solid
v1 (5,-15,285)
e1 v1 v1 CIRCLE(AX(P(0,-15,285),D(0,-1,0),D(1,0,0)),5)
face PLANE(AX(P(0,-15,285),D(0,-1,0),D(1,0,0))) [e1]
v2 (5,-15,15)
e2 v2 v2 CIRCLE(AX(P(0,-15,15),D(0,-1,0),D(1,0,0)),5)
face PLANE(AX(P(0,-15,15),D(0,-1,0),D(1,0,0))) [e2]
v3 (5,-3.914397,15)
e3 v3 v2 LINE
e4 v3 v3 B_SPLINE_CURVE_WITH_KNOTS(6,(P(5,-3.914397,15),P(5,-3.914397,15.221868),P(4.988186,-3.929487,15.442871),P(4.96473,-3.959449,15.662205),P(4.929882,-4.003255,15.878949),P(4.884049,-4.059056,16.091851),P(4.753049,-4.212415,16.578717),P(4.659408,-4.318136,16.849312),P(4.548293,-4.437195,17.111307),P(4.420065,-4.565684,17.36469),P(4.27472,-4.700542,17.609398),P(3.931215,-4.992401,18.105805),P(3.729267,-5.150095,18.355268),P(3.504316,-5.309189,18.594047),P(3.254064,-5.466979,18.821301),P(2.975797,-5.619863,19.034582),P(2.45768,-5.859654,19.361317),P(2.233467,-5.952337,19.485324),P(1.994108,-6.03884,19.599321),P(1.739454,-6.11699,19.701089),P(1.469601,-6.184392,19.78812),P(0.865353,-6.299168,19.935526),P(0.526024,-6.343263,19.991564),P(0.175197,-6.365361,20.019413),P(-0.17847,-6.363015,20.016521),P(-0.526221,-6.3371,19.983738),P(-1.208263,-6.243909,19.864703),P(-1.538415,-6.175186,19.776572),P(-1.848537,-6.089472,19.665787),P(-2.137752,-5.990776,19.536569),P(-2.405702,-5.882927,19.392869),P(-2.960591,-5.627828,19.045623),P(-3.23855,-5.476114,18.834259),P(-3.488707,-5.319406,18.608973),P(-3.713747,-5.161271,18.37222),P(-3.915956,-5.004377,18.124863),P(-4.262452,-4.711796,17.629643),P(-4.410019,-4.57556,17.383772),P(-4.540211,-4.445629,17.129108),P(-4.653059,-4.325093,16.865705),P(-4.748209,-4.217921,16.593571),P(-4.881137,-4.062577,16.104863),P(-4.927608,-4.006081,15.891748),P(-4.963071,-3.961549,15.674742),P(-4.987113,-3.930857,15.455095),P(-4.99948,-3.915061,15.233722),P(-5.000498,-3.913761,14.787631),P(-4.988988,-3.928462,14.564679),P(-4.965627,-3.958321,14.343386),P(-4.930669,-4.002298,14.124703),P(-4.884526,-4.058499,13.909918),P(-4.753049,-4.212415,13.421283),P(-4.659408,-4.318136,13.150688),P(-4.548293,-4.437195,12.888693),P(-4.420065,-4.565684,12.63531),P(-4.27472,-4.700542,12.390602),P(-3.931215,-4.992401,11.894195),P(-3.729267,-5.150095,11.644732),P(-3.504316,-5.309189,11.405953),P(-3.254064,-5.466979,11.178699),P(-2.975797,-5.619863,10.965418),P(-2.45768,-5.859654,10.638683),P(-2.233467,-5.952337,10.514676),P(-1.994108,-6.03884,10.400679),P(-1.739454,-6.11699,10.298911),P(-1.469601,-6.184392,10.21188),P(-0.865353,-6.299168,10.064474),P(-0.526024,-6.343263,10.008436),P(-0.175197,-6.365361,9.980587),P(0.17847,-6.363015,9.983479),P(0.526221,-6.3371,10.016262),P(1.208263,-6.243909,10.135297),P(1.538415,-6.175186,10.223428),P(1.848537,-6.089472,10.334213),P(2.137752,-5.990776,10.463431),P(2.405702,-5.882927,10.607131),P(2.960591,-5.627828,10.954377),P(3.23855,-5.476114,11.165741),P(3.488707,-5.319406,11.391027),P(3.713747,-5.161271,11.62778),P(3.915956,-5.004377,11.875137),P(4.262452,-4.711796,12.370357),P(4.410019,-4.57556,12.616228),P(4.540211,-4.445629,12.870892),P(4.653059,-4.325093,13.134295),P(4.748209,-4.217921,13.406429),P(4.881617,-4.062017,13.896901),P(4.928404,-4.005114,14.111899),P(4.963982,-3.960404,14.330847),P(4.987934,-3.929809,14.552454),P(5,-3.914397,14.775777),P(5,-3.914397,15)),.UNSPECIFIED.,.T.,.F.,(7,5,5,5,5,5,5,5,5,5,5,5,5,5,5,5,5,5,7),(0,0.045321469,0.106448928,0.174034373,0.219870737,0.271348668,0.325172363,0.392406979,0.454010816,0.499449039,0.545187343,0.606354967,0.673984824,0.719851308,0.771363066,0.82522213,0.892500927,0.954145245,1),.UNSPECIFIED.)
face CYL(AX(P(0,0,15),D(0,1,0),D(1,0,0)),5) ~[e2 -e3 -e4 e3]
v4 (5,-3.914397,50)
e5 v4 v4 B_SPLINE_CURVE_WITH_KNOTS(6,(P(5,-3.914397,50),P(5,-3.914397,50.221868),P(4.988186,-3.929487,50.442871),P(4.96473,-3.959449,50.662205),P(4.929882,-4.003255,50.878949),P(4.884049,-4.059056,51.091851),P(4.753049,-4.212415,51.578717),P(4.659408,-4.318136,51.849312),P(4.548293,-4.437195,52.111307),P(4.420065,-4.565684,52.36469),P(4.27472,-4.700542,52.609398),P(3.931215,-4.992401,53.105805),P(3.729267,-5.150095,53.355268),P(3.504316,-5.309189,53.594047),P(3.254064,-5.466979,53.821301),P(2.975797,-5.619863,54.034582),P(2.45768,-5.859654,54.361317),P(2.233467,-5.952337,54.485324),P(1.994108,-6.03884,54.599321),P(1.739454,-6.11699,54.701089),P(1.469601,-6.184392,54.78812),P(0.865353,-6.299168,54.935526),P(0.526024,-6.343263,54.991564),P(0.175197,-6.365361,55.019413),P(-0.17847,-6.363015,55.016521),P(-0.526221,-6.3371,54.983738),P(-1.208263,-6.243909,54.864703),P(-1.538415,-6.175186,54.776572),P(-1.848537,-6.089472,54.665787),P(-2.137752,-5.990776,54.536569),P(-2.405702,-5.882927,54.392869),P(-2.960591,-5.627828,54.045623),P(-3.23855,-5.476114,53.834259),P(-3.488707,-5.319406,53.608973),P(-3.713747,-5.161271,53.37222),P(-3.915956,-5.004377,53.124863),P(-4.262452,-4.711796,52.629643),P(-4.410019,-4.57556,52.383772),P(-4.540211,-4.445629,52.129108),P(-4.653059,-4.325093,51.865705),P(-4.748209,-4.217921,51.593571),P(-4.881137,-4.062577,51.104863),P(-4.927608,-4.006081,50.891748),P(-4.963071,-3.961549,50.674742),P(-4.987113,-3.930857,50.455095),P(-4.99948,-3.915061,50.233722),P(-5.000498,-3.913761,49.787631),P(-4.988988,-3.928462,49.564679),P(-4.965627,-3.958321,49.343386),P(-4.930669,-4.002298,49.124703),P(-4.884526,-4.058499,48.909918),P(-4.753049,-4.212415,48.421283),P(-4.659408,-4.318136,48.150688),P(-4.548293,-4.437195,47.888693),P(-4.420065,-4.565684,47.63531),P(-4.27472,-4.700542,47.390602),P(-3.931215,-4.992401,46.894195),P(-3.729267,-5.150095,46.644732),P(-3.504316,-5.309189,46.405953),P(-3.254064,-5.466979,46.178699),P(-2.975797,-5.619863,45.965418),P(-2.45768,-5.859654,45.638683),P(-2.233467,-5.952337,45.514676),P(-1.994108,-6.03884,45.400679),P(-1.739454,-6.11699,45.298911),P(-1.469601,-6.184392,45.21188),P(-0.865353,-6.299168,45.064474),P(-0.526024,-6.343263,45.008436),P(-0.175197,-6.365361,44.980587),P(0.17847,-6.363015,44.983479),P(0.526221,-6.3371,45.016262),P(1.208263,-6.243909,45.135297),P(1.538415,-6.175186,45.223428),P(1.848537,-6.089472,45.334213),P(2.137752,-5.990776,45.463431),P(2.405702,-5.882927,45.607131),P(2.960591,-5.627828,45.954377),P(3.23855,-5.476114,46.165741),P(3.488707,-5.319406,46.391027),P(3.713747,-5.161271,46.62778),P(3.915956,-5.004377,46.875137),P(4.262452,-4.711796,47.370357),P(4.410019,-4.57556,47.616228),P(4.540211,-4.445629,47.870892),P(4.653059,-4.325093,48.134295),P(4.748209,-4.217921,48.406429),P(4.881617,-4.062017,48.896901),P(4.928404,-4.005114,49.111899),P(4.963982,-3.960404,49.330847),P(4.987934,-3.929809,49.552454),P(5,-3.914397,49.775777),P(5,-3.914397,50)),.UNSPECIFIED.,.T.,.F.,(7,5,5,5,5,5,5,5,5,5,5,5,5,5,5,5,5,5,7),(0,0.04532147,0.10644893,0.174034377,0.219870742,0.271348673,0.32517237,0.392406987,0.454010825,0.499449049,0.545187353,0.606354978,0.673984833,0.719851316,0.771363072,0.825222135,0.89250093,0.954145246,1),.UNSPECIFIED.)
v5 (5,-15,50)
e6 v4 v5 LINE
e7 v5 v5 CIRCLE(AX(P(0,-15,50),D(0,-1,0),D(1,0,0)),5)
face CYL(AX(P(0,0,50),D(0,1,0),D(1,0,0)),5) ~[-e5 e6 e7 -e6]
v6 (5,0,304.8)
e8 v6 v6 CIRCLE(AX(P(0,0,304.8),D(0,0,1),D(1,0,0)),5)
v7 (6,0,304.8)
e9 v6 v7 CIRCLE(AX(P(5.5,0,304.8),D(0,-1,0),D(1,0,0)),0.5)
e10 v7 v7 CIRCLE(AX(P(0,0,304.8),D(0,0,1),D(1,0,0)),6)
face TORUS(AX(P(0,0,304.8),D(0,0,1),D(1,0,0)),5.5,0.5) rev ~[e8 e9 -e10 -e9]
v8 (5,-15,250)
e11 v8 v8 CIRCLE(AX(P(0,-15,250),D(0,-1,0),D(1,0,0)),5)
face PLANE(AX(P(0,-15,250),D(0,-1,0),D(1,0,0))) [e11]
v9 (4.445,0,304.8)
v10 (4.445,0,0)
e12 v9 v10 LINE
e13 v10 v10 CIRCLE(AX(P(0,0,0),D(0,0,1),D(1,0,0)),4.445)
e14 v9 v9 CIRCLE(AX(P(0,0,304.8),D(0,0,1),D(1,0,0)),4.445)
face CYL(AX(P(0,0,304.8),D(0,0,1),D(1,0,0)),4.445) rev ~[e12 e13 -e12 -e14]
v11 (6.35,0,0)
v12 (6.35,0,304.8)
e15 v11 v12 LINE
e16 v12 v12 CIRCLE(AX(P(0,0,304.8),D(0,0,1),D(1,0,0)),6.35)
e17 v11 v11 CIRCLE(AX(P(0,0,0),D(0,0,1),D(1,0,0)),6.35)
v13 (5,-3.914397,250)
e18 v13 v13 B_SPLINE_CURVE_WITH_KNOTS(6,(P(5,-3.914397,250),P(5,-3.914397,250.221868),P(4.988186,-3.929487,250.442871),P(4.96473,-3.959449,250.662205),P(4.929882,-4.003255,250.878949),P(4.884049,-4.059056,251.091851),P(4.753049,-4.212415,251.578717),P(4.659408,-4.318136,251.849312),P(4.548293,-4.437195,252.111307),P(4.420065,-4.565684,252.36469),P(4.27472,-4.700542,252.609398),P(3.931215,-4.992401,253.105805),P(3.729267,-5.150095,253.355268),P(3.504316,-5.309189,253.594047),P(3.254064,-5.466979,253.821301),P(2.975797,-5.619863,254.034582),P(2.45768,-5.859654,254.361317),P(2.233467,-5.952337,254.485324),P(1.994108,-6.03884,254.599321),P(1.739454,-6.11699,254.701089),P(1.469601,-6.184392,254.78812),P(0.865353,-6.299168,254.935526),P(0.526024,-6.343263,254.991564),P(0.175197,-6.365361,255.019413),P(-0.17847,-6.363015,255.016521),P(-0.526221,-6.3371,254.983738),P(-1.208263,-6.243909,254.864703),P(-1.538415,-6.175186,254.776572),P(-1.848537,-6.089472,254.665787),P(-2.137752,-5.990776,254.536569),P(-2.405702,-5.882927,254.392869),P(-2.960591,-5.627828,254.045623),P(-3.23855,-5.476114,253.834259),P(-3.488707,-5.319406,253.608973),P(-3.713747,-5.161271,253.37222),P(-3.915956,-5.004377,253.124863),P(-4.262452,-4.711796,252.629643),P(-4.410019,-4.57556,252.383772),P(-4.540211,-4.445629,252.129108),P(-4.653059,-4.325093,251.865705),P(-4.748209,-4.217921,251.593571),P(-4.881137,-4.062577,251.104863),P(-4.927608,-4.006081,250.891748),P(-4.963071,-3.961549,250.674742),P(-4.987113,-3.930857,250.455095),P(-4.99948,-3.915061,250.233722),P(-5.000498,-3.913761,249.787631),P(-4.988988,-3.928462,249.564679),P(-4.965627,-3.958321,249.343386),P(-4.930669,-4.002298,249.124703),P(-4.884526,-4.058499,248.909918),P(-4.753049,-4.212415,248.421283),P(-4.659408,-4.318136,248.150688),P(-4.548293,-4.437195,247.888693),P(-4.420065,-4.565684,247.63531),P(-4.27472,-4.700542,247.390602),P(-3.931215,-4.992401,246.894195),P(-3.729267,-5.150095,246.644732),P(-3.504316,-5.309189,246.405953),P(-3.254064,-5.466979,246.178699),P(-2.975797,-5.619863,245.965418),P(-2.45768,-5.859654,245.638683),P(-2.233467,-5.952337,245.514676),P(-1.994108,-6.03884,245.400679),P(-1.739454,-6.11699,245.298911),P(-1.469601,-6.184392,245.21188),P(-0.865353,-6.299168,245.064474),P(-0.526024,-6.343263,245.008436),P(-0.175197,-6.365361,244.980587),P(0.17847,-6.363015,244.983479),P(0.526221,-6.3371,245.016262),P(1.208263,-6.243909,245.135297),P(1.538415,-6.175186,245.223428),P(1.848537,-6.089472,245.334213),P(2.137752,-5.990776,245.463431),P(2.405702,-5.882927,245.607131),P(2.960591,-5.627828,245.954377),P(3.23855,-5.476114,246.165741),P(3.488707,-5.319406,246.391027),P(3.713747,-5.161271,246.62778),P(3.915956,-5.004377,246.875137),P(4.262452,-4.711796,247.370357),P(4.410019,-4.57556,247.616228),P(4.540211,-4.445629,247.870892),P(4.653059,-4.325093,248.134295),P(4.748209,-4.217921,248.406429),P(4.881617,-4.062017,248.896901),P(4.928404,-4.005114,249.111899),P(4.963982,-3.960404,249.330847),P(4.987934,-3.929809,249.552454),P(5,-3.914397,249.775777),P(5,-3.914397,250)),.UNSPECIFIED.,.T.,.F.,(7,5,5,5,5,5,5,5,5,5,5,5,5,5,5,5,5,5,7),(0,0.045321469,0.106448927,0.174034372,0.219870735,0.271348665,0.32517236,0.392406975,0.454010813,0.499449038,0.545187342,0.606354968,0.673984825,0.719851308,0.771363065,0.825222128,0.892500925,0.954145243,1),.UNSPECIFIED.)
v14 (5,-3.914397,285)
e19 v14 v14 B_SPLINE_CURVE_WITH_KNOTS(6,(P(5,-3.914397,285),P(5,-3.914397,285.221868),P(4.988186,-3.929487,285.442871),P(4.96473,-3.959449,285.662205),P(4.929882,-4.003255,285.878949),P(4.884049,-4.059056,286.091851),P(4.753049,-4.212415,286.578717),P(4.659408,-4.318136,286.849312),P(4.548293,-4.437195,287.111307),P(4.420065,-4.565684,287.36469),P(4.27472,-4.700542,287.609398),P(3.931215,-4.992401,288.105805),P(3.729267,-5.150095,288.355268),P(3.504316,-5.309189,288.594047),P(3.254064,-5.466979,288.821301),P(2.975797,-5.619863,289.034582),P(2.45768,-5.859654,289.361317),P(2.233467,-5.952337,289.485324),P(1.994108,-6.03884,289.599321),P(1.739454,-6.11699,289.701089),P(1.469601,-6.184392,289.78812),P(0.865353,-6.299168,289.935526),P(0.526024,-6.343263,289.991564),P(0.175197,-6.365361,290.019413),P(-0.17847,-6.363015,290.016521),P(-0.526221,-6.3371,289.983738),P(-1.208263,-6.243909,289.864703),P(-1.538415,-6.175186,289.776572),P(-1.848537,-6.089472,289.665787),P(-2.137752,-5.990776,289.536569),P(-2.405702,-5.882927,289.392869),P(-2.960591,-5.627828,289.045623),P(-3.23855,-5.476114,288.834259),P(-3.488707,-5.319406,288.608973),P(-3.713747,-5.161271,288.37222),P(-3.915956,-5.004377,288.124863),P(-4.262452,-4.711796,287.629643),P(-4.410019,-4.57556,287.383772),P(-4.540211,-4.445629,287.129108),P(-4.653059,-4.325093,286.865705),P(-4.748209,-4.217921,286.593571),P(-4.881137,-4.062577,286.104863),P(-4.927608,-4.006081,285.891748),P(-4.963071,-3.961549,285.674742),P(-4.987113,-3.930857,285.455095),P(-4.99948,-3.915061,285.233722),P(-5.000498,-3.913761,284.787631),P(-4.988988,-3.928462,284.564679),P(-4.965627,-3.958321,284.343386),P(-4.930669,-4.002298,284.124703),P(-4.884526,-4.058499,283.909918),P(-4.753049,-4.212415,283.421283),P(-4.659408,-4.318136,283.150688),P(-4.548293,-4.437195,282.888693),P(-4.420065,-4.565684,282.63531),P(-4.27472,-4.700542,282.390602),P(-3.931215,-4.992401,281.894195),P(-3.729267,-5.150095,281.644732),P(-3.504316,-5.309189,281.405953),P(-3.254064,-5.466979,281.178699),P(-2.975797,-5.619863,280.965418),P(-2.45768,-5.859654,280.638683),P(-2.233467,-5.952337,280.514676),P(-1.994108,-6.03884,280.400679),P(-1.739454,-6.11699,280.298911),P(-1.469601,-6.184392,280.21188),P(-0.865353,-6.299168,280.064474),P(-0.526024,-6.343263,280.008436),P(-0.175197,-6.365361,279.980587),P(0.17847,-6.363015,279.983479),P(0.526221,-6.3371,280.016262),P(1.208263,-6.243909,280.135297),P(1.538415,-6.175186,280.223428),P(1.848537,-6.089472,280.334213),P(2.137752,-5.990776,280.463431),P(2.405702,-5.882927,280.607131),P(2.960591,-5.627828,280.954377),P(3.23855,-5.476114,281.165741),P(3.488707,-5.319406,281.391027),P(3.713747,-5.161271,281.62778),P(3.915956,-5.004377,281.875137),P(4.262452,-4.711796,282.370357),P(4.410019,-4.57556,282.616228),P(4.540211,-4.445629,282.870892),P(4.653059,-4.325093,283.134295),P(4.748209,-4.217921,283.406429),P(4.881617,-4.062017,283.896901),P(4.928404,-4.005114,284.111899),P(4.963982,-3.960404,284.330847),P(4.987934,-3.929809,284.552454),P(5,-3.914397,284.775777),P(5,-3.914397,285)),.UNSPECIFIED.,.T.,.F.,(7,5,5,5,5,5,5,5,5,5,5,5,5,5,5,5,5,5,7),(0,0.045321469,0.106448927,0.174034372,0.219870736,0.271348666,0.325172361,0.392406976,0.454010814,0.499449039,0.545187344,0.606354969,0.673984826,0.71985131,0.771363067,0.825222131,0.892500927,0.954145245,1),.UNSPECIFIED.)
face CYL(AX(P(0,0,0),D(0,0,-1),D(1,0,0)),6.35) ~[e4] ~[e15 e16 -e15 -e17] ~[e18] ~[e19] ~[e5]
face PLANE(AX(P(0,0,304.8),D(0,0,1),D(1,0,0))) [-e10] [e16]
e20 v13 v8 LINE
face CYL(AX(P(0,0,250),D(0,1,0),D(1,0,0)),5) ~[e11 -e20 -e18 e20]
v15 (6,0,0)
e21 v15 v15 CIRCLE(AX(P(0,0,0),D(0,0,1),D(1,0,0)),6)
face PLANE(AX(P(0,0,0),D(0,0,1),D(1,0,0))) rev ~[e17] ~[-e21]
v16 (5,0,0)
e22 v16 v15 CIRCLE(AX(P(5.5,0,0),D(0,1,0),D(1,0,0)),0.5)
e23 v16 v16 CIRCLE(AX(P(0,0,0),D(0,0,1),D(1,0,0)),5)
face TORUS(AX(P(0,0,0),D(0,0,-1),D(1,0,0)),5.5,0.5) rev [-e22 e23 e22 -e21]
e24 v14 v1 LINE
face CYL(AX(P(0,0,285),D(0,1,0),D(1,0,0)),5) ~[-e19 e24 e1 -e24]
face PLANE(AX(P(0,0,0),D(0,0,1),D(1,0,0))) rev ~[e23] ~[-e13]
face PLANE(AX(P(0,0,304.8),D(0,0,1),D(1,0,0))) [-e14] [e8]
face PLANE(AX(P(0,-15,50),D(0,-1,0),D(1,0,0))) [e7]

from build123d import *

# Parameters (mm, degrees)
F0_R     = 6.35
F1_DEPTH = 304.8
F2_R     = 5
F4_DEPTH = 15
F3_R     = 4.445
F5_DEPTH = 304.8010001


# Not quite as in the source:
# - a pattern or mirror of a feature is missing from the dataset's text; its kind, count and spacing are read off the source's solid


with BuildPart() as f1:
    # F0 (on Top) → F1 (new body)
    with BuildSketch(Plane.XY):
        Circle(F0_R)
    extrude(amount=F1_DEPTH)

    # F2 (on Front) → F4 (join)
    with BuildSketch(Plane.XZ):
        with Locations((0, 15)):
            Circle(F2_R)
        with Locations((0, 50)):
            Circle(F2_R)
        with Locations((0, 250)):
            Circle(F2_R)
        with Locations((0, 285)):
            Circle(F2_R)
    extrude(amount=F4_DEPTH)

    # F3 (on face) → F5 (cut, through all)
    with BuildSketch(Plane.XY.offset(304.8)):
        Circle(F3_R)
    extrude(amount=-F5_DEPTH, mode=Mode.SUBTRACT)

    # F8: sweep along a path in F6
    with BuildLine(Plane.XY.offset(304.8)) as f8_path:
        CenterArc((0, 0), 5.461, 0, 360)
    # F7 (on Front) → F8 (sweep, cut)
    with BuildSketch(Plane.XZ):
        with BuildLine():
            Line((-5, 304.8), (-6, 304.8))
            ThreePointArc((-6, 304.8), (-5.5, 304.3), (-5, 304.8))
        make_face()
    f8 = sweep(path=f8_path.line, mode=Mode.SUBTRACT)

    # F8_copies: F8 across plane
    add(f8.mirror(Plane(origin=(0, 0, 152.4), x_dir=(-1, 0, 0), z_dir=(0, 0, -1))), mode=Mode.SUBTRACT)


solid = f1.part
